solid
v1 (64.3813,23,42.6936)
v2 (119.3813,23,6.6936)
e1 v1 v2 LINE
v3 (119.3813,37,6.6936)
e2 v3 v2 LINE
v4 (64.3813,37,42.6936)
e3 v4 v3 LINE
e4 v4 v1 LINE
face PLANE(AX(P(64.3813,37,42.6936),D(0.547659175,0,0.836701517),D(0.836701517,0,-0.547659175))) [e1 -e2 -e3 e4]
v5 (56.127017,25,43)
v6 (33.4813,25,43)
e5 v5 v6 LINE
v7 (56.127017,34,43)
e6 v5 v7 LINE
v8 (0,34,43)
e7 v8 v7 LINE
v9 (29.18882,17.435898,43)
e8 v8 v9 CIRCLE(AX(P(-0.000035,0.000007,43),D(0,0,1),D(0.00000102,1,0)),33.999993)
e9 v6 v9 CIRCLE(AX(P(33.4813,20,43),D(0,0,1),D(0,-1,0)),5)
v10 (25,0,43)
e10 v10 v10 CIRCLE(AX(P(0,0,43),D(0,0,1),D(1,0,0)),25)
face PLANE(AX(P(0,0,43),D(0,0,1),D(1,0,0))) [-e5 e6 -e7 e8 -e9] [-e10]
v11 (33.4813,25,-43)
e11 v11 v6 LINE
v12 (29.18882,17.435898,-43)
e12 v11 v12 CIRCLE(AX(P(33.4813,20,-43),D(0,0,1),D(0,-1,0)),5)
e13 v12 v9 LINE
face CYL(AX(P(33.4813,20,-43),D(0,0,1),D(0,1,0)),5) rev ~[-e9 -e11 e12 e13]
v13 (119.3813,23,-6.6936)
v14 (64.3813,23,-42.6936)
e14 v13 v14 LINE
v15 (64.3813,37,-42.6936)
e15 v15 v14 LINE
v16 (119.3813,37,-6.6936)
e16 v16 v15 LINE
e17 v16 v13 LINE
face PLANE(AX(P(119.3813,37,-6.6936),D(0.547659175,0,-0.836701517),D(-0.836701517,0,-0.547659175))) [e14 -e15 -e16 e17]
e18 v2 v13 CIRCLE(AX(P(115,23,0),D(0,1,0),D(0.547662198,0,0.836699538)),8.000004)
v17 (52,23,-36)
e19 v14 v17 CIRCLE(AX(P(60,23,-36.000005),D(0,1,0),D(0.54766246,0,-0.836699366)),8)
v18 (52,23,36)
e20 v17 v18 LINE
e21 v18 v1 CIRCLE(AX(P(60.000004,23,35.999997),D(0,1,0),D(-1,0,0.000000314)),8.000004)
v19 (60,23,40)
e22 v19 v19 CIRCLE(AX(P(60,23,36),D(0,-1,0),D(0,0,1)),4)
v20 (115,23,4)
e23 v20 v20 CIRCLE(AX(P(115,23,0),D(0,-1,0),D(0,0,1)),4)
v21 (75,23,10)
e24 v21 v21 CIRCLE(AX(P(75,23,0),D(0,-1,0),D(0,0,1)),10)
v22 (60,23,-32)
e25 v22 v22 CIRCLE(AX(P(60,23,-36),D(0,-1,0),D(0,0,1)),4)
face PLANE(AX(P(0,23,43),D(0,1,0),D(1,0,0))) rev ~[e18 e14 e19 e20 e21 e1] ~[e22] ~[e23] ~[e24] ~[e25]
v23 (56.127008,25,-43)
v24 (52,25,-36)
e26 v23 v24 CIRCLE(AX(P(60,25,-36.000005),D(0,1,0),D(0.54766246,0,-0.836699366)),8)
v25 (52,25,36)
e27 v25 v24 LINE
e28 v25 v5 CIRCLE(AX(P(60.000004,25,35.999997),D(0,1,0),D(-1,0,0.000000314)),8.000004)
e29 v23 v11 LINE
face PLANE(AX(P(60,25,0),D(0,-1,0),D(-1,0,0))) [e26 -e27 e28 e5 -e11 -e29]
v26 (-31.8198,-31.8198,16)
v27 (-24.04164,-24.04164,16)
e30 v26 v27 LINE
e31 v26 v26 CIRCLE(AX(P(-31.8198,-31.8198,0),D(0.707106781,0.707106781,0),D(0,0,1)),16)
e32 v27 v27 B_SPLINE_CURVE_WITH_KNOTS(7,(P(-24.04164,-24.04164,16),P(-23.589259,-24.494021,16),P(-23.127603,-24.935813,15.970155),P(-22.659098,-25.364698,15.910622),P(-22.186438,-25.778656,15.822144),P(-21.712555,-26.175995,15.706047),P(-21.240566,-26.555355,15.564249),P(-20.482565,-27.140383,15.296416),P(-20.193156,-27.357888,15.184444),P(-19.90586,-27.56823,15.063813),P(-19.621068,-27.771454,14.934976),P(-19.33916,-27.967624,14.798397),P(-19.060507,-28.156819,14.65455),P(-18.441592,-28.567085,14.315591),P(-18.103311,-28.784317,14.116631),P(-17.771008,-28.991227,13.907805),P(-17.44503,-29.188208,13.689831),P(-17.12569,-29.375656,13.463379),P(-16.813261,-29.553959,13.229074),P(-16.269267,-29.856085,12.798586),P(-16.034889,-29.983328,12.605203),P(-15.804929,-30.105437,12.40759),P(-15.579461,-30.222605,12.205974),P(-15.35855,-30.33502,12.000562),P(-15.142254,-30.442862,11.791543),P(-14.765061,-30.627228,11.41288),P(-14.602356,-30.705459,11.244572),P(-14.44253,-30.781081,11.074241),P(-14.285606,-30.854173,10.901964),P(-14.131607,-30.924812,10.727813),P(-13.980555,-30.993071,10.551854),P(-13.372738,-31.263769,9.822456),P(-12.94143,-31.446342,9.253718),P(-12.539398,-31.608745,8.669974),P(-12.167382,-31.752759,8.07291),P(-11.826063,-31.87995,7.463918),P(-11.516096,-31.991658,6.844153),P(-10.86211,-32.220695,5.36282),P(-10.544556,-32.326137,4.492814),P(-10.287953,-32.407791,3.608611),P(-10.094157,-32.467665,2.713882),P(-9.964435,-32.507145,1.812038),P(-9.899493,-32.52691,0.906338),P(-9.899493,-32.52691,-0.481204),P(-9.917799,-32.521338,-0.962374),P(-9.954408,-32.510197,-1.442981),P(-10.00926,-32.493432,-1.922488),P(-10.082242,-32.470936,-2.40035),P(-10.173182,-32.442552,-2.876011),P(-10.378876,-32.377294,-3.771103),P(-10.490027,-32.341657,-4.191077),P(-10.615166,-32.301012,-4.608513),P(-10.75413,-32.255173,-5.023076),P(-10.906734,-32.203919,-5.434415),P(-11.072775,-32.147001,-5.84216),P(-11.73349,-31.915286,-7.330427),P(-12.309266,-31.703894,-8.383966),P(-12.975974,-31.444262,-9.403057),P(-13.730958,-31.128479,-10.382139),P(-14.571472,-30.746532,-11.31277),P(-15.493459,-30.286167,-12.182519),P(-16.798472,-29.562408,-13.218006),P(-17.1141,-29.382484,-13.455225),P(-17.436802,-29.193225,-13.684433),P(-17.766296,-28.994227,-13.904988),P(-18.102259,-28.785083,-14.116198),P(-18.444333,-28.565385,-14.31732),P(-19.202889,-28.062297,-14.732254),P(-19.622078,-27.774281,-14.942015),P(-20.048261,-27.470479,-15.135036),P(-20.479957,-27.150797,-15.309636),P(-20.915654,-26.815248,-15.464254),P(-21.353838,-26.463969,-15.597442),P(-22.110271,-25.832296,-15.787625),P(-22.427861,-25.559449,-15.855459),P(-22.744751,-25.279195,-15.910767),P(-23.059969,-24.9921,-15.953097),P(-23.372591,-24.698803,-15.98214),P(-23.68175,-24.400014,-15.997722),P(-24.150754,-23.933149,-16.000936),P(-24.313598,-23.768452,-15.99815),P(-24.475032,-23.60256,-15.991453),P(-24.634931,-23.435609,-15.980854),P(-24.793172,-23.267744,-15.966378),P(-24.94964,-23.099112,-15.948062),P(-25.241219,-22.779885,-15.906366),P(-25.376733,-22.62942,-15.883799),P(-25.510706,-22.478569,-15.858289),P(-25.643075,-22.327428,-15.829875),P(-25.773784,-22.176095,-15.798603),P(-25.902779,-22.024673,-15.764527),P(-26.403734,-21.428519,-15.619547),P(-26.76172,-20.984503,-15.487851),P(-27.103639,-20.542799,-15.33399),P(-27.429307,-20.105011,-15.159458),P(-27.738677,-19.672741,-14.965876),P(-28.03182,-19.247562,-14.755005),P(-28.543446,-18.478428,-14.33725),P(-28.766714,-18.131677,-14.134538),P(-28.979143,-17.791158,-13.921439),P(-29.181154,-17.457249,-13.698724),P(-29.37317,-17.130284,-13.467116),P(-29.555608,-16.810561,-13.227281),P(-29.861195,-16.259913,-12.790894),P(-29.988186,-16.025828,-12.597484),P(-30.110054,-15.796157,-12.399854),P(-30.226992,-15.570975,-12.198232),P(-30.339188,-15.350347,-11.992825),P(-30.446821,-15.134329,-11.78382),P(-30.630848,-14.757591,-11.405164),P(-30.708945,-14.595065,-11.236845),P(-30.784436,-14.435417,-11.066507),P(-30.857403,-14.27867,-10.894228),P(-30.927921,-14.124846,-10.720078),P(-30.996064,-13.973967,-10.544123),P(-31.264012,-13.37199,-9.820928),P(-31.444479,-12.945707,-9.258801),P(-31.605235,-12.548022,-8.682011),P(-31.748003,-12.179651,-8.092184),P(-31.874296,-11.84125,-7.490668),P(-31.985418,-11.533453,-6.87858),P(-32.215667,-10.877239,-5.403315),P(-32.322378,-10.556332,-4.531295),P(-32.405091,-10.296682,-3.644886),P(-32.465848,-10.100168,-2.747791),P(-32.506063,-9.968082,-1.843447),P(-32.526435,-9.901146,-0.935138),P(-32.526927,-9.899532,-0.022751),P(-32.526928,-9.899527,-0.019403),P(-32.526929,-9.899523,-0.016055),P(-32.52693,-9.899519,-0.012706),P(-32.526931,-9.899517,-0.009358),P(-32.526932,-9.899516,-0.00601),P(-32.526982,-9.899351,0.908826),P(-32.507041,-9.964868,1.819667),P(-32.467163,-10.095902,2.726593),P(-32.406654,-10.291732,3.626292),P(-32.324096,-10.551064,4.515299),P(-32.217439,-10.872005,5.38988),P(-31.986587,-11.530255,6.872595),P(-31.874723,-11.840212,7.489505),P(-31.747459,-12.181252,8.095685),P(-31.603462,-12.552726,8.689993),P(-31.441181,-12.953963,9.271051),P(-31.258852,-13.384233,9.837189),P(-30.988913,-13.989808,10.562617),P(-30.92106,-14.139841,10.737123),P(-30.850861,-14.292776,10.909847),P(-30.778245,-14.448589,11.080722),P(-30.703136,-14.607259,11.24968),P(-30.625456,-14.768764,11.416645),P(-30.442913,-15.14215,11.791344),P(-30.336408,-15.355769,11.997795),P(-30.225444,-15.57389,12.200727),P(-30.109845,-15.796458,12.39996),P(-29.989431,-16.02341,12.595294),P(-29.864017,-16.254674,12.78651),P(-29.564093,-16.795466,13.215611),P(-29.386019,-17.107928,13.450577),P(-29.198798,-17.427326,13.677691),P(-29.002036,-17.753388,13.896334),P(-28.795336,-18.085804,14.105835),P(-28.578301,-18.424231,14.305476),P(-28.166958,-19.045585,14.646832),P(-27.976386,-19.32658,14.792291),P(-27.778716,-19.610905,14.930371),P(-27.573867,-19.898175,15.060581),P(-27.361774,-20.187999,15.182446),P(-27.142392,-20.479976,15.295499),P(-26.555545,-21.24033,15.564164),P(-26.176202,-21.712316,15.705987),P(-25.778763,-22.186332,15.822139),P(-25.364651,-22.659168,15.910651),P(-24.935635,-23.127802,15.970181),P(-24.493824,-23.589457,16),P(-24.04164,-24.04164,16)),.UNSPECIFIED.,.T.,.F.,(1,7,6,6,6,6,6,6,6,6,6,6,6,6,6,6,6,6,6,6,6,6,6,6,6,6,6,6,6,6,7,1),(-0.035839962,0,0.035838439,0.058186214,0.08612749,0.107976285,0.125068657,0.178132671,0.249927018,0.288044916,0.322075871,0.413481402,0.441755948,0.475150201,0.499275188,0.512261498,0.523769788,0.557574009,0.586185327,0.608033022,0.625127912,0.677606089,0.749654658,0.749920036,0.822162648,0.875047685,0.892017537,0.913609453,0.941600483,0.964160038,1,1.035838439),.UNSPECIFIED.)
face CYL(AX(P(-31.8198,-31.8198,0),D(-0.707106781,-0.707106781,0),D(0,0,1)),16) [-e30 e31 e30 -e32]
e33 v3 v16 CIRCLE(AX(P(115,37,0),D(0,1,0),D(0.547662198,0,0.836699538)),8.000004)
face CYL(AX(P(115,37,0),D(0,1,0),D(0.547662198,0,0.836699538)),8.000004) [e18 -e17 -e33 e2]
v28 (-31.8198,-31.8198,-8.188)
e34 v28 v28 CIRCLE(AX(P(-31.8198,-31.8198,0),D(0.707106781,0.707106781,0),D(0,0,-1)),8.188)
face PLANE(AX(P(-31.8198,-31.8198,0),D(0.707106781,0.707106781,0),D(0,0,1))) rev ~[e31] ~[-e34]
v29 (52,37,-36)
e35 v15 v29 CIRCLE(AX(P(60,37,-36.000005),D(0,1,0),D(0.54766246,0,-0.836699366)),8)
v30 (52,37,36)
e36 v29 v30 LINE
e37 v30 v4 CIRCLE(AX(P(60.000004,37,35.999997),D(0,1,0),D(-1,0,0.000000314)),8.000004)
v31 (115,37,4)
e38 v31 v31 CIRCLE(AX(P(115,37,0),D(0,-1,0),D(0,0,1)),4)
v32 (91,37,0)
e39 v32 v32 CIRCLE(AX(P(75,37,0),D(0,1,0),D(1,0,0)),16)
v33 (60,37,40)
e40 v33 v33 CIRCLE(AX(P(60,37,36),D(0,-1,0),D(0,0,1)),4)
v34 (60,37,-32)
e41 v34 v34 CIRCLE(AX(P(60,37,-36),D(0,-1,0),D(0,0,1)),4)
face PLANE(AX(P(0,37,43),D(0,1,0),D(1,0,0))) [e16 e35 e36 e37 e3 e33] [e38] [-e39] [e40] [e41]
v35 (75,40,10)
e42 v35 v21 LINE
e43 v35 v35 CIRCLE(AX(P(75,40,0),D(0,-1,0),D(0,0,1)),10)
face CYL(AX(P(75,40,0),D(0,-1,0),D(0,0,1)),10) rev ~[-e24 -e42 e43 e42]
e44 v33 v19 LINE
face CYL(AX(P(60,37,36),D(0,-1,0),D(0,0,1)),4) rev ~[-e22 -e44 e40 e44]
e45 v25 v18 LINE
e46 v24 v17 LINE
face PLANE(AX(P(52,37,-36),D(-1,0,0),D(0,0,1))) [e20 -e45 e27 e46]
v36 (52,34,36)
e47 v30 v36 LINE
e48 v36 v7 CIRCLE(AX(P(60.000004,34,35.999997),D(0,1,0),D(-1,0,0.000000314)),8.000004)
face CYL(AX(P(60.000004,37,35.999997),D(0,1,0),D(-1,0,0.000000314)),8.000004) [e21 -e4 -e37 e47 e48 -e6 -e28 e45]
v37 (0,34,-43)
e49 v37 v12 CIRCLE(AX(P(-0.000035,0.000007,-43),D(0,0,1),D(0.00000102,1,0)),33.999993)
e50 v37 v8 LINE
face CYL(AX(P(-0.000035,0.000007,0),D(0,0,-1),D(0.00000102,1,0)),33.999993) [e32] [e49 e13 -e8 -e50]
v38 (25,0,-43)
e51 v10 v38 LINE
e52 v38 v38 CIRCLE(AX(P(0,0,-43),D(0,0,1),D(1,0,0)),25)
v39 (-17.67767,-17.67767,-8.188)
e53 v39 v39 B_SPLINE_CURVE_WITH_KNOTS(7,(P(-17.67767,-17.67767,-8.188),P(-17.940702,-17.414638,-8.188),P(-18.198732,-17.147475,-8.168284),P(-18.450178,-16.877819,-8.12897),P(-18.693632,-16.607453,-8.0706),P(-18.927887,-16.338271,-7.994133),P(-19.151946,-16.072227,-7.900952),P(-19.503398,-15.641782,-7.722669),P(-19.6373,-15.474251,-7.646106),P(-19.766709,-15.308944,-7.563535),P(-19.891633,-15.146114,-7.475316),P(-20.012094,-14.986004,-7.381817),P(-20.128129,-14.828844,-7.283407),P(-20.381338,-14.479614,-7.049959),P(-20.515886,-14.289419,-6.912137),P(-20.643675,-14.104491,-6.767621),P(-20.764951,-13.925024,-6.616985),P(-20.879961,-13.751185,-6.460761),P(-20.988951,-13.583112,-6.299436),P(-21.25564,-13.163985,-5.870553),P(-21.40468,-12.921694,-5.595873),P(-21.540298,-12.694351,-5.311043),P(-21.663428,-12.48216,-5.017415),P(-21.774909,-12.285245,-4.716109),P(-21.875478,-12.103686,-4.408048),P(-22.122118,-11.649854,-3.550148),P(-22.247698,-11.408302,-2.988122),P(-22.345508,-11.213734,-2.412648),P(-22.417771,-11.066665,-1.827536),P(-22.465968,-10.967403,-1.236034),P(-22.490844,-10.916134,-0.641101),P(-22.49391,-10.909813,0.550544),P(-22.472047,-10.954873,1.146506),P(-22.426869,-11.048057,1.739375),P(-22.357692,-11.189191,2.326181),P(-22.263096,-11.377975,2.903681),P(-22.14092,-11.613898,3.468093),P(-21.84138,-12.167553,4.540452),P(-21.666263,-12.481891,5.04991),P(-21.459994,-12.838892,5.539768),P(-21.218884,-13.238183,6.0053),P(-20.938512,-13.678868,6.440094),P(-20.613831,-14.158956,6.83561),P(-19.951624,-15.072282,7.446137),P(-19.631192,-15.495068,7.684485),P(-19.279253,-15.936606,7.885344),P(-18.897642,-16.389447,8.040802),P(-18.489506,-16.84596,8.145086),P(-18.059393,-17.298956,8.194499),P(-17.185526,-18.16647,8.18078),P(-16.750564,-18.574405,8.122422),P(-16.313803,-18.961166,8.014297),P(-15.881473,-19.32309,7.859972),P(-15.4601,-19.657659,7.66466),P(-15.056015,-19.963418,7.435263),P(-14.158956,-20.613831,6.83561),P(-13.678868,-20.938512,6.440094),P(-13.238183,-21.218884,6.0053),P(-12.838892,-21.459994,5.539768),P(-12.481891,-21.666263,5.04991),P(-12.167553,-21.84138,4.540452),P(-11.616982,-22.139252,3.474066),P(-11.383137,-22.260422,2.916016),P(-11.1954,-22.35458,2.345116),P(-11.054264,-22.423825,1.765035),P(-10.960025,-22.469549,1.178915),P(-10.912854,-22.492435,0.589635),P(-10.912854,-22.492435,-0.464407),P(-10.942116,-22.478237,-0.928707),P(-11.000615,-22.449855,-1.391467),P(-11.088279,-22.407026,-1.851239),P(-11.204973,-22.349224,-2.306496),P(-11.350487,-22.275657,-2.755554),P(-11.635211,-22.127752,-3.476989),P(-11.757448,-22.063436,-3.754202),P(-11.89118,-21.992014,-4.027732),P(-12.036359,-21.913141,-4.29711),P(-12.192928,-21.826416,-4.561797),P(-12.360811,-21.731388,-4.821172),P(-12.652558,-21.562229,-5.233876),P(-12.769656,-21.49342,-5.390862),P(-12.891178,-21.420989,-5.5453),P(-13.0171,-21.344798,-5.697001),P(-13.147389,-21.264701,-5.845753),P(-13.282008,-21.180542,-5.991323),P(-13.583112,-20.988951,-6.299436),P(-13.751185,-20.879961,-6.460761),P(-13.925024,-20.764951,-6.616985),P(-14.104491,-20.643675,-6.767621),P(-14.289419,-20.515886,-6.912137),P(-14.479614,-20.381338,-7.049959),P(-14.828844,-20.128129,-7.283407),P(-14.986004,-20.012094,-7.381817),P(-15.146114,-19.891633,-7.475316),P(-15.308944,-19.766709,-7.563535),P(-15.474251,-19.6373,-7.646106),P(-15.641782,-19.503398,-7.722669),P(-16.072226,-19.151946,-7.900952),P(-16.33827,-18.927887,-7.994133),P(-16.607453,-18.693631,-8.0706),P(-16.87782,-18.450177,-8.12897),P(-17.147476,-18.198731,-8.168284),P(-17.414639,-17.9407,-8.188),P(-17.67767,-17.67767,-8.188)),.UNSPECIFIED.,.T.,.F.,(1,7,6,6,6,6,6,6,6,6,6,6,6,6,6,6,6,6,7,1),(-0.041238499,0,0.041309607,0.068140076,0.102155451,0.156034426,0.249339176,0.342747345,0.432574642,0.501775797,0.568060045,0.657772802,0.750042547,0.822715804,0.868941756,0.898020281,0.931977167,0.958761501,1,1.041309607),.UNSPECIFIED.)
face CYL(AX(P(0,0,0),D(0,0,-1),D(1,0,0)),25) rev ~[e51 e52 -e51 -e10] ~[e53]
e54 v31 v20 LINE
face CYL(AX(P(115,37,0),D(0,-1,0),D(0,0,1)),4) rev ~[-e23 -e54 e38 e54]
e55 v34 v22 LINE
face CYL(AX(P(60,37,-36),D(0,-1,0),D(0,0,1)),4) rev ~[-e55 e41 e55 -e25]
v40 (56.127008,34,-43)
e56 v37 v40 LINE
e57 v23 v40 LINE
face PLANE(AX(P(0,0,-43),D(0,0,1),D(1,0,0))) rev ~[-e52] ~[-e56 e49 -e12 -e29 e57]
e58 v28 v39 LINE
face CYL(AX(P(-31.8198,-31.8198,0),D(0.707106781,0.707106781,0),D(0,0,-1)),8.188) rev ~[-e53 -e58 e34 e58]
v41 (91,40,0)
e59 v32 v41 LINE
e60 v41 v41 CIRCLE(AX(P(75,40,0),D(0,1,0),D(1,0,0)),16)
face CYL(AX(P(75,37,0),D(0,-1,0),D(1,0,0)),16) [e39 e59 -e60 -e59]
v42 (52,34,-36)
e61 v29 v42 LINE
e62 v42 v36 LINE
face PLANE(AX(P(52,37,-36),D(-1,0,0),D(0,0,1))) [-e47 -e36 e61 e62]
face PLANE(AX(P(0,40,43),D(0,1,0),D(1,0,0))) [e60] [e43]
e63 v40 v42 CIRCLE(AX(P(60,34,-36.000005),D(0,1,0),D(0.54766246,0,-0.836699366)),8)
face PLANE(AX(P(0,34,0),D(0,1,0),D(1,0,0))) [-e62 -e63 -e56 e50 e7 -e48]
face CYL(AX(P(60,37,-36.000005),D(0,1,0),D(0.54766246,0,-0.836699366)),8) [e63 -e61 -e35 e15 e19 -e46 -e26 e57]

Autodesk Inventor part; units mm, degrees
ref_plane "YZ Plane" through (0, 0, 0) normal (1, 0, 0) x (0, 1, 0)
sketch "Sketch1" plane through (0, 0, 0) normal (0, 0, 1) x (1, 0, 0)
  circle A0 centre (0, 0) radius 25
  arc A1 (0, 34) -> (23.0434, 25) centre (0, 0) ccw
  line L0 (0, 34) -> (60, 34)
  line L1 (60, 34) -> (60, 25)
  line L2 (60, 25) -> (23.0434, 25)
  arc A2 (23.0434, 25) -> (0, 34) centre (0, 0) ccw construction
  dimension "d1" = 68
  dimension "d2" = 50
  dimension "d3" = 9
  dimension "d4" = 60
extrude "Extrusion1" add sketch "Sketch1" along normal mid plane 86
ref_plane "Work Plane1" through (0, 37, 43) normal (0, 1, 0) x (1, 0, 0)
sketch "Sketch2" plane through (0, 37, 43) normal (0, 1, 0) x (1, 0, 0)
  line L0 (60, 79) -> (115, 43) construction
  line L1 (115, 43) -> (60, 7) construction
  line L2 (60, 7) -> (60, 79) construction
  line L3 (60, 86) -> (60, 0) projected
  line L4 (119.3813, 49.6936) -> (64.3813, 85.6936)
  line L5 (52, 79) -> (52, 7)
  line L6 (64.3813, 0.3064) -> (119.3813, 36.3064)
  arc A0 (64.3813, 85.6936) -> (52, 79) centre (60, 79) ccw
  arc A1 (52, 7) -> (64.3813, 0.3064) centre (60, 7) ccw
  arc A2 (119.3813, 36.3064) -> (119.3813, 49.6936) centre (115, 43) ccw
  point P0 (0, 43)
  dimension "d8" = 55
  dimension "d9" = 72
  dimension "d10" = 8
  dimension "d11" = 8
extrude "Extrusion2" add sketch "Sketch2" against normal blind 14
sketch "Sketch3" plane through (0, 37, 43) normal (0, 1, 0) x (1, 0, 0)
  arc A0 (64.3813, 85.6936) -> (52, 79) centre (60, 79) ccw projected
  arc A1 (52, 7) -> (64.3813, 0.3064) centre (60, 7) ccw projected
  arc A2 (119.3813, 36.3064) -> (119.3813, 49.6936) centre (115, 43) ccw projected
  point P0 (0, 43)
hole "Hole1" at (60, 37, 36) at (60, 37, -36) at (115, 37, 0) direction (0, -1, 0) diameter 8 end through all
sketch "Sketch4" plane through (0, 37, 43) normal (0, 1, 0) x (1, 0, 0)
  circle A0 centre (115, 43) radius 4 projected
  circle A1 centre (75, 43) radius 16
  point P0 (0, 43)
  dimension "d21" = 32
  dimension "d22" = 40
extrude "Extrusion3" add sketch "Sketch4" along normal blind 3 contours A1
sketch "Sketch5" plane through (75, 40, 0) normal (0, 1, 0) x (1, 0, 0)
  circle A0 centre (0, 0) radius 16 projected
  point P0 (-75, 0)
hole "Hole2" at (75, 40, 0) direction (0, -1, 0) diameter 20 end through all
ref_plane "Work Plane3" through (-31.8198, -31.8198, 0) normal (0.7071068, 0.7071068, 0) x (0, 0, 1)
ref_plane "Work Plane2" through (0, 0, 0) normal (0.7071068, 0.7071068, 0) x (0, 0, 1)
sketch "Sketch6" plane through (-31.8198, -31.8198, 0) normal (0.7071068, 0.7071068, 0) x (0, 0, 1)
  circle A0 centre (0, 0) radius 16
  dimension "d34" = 32
extrude "Extrusion4" add sketch "Sketch6" along normal up to next
sketch "Sketch7" plane through (-31.8198, -31.8198, 0) normal (-0.7071068, -0.7071068, 0) x (-0.7071068, 0.7071068, 0)
  circle A0 centre (0, 0) radius 16 projected
hole "Hole3" at (-31.8198, -31.8198, 0) direction (0.7071068, 0.7071068, 0) diameter 16.376 end up to surface thread size "M18x1.5" class "6H" standard "ISO Metric profile"
fillet "Fillet1" radius 5 1 edges at (23.0434, 25, 0)
properties part number "Part033.Pivoting connection" material "Steel, Carbon"
